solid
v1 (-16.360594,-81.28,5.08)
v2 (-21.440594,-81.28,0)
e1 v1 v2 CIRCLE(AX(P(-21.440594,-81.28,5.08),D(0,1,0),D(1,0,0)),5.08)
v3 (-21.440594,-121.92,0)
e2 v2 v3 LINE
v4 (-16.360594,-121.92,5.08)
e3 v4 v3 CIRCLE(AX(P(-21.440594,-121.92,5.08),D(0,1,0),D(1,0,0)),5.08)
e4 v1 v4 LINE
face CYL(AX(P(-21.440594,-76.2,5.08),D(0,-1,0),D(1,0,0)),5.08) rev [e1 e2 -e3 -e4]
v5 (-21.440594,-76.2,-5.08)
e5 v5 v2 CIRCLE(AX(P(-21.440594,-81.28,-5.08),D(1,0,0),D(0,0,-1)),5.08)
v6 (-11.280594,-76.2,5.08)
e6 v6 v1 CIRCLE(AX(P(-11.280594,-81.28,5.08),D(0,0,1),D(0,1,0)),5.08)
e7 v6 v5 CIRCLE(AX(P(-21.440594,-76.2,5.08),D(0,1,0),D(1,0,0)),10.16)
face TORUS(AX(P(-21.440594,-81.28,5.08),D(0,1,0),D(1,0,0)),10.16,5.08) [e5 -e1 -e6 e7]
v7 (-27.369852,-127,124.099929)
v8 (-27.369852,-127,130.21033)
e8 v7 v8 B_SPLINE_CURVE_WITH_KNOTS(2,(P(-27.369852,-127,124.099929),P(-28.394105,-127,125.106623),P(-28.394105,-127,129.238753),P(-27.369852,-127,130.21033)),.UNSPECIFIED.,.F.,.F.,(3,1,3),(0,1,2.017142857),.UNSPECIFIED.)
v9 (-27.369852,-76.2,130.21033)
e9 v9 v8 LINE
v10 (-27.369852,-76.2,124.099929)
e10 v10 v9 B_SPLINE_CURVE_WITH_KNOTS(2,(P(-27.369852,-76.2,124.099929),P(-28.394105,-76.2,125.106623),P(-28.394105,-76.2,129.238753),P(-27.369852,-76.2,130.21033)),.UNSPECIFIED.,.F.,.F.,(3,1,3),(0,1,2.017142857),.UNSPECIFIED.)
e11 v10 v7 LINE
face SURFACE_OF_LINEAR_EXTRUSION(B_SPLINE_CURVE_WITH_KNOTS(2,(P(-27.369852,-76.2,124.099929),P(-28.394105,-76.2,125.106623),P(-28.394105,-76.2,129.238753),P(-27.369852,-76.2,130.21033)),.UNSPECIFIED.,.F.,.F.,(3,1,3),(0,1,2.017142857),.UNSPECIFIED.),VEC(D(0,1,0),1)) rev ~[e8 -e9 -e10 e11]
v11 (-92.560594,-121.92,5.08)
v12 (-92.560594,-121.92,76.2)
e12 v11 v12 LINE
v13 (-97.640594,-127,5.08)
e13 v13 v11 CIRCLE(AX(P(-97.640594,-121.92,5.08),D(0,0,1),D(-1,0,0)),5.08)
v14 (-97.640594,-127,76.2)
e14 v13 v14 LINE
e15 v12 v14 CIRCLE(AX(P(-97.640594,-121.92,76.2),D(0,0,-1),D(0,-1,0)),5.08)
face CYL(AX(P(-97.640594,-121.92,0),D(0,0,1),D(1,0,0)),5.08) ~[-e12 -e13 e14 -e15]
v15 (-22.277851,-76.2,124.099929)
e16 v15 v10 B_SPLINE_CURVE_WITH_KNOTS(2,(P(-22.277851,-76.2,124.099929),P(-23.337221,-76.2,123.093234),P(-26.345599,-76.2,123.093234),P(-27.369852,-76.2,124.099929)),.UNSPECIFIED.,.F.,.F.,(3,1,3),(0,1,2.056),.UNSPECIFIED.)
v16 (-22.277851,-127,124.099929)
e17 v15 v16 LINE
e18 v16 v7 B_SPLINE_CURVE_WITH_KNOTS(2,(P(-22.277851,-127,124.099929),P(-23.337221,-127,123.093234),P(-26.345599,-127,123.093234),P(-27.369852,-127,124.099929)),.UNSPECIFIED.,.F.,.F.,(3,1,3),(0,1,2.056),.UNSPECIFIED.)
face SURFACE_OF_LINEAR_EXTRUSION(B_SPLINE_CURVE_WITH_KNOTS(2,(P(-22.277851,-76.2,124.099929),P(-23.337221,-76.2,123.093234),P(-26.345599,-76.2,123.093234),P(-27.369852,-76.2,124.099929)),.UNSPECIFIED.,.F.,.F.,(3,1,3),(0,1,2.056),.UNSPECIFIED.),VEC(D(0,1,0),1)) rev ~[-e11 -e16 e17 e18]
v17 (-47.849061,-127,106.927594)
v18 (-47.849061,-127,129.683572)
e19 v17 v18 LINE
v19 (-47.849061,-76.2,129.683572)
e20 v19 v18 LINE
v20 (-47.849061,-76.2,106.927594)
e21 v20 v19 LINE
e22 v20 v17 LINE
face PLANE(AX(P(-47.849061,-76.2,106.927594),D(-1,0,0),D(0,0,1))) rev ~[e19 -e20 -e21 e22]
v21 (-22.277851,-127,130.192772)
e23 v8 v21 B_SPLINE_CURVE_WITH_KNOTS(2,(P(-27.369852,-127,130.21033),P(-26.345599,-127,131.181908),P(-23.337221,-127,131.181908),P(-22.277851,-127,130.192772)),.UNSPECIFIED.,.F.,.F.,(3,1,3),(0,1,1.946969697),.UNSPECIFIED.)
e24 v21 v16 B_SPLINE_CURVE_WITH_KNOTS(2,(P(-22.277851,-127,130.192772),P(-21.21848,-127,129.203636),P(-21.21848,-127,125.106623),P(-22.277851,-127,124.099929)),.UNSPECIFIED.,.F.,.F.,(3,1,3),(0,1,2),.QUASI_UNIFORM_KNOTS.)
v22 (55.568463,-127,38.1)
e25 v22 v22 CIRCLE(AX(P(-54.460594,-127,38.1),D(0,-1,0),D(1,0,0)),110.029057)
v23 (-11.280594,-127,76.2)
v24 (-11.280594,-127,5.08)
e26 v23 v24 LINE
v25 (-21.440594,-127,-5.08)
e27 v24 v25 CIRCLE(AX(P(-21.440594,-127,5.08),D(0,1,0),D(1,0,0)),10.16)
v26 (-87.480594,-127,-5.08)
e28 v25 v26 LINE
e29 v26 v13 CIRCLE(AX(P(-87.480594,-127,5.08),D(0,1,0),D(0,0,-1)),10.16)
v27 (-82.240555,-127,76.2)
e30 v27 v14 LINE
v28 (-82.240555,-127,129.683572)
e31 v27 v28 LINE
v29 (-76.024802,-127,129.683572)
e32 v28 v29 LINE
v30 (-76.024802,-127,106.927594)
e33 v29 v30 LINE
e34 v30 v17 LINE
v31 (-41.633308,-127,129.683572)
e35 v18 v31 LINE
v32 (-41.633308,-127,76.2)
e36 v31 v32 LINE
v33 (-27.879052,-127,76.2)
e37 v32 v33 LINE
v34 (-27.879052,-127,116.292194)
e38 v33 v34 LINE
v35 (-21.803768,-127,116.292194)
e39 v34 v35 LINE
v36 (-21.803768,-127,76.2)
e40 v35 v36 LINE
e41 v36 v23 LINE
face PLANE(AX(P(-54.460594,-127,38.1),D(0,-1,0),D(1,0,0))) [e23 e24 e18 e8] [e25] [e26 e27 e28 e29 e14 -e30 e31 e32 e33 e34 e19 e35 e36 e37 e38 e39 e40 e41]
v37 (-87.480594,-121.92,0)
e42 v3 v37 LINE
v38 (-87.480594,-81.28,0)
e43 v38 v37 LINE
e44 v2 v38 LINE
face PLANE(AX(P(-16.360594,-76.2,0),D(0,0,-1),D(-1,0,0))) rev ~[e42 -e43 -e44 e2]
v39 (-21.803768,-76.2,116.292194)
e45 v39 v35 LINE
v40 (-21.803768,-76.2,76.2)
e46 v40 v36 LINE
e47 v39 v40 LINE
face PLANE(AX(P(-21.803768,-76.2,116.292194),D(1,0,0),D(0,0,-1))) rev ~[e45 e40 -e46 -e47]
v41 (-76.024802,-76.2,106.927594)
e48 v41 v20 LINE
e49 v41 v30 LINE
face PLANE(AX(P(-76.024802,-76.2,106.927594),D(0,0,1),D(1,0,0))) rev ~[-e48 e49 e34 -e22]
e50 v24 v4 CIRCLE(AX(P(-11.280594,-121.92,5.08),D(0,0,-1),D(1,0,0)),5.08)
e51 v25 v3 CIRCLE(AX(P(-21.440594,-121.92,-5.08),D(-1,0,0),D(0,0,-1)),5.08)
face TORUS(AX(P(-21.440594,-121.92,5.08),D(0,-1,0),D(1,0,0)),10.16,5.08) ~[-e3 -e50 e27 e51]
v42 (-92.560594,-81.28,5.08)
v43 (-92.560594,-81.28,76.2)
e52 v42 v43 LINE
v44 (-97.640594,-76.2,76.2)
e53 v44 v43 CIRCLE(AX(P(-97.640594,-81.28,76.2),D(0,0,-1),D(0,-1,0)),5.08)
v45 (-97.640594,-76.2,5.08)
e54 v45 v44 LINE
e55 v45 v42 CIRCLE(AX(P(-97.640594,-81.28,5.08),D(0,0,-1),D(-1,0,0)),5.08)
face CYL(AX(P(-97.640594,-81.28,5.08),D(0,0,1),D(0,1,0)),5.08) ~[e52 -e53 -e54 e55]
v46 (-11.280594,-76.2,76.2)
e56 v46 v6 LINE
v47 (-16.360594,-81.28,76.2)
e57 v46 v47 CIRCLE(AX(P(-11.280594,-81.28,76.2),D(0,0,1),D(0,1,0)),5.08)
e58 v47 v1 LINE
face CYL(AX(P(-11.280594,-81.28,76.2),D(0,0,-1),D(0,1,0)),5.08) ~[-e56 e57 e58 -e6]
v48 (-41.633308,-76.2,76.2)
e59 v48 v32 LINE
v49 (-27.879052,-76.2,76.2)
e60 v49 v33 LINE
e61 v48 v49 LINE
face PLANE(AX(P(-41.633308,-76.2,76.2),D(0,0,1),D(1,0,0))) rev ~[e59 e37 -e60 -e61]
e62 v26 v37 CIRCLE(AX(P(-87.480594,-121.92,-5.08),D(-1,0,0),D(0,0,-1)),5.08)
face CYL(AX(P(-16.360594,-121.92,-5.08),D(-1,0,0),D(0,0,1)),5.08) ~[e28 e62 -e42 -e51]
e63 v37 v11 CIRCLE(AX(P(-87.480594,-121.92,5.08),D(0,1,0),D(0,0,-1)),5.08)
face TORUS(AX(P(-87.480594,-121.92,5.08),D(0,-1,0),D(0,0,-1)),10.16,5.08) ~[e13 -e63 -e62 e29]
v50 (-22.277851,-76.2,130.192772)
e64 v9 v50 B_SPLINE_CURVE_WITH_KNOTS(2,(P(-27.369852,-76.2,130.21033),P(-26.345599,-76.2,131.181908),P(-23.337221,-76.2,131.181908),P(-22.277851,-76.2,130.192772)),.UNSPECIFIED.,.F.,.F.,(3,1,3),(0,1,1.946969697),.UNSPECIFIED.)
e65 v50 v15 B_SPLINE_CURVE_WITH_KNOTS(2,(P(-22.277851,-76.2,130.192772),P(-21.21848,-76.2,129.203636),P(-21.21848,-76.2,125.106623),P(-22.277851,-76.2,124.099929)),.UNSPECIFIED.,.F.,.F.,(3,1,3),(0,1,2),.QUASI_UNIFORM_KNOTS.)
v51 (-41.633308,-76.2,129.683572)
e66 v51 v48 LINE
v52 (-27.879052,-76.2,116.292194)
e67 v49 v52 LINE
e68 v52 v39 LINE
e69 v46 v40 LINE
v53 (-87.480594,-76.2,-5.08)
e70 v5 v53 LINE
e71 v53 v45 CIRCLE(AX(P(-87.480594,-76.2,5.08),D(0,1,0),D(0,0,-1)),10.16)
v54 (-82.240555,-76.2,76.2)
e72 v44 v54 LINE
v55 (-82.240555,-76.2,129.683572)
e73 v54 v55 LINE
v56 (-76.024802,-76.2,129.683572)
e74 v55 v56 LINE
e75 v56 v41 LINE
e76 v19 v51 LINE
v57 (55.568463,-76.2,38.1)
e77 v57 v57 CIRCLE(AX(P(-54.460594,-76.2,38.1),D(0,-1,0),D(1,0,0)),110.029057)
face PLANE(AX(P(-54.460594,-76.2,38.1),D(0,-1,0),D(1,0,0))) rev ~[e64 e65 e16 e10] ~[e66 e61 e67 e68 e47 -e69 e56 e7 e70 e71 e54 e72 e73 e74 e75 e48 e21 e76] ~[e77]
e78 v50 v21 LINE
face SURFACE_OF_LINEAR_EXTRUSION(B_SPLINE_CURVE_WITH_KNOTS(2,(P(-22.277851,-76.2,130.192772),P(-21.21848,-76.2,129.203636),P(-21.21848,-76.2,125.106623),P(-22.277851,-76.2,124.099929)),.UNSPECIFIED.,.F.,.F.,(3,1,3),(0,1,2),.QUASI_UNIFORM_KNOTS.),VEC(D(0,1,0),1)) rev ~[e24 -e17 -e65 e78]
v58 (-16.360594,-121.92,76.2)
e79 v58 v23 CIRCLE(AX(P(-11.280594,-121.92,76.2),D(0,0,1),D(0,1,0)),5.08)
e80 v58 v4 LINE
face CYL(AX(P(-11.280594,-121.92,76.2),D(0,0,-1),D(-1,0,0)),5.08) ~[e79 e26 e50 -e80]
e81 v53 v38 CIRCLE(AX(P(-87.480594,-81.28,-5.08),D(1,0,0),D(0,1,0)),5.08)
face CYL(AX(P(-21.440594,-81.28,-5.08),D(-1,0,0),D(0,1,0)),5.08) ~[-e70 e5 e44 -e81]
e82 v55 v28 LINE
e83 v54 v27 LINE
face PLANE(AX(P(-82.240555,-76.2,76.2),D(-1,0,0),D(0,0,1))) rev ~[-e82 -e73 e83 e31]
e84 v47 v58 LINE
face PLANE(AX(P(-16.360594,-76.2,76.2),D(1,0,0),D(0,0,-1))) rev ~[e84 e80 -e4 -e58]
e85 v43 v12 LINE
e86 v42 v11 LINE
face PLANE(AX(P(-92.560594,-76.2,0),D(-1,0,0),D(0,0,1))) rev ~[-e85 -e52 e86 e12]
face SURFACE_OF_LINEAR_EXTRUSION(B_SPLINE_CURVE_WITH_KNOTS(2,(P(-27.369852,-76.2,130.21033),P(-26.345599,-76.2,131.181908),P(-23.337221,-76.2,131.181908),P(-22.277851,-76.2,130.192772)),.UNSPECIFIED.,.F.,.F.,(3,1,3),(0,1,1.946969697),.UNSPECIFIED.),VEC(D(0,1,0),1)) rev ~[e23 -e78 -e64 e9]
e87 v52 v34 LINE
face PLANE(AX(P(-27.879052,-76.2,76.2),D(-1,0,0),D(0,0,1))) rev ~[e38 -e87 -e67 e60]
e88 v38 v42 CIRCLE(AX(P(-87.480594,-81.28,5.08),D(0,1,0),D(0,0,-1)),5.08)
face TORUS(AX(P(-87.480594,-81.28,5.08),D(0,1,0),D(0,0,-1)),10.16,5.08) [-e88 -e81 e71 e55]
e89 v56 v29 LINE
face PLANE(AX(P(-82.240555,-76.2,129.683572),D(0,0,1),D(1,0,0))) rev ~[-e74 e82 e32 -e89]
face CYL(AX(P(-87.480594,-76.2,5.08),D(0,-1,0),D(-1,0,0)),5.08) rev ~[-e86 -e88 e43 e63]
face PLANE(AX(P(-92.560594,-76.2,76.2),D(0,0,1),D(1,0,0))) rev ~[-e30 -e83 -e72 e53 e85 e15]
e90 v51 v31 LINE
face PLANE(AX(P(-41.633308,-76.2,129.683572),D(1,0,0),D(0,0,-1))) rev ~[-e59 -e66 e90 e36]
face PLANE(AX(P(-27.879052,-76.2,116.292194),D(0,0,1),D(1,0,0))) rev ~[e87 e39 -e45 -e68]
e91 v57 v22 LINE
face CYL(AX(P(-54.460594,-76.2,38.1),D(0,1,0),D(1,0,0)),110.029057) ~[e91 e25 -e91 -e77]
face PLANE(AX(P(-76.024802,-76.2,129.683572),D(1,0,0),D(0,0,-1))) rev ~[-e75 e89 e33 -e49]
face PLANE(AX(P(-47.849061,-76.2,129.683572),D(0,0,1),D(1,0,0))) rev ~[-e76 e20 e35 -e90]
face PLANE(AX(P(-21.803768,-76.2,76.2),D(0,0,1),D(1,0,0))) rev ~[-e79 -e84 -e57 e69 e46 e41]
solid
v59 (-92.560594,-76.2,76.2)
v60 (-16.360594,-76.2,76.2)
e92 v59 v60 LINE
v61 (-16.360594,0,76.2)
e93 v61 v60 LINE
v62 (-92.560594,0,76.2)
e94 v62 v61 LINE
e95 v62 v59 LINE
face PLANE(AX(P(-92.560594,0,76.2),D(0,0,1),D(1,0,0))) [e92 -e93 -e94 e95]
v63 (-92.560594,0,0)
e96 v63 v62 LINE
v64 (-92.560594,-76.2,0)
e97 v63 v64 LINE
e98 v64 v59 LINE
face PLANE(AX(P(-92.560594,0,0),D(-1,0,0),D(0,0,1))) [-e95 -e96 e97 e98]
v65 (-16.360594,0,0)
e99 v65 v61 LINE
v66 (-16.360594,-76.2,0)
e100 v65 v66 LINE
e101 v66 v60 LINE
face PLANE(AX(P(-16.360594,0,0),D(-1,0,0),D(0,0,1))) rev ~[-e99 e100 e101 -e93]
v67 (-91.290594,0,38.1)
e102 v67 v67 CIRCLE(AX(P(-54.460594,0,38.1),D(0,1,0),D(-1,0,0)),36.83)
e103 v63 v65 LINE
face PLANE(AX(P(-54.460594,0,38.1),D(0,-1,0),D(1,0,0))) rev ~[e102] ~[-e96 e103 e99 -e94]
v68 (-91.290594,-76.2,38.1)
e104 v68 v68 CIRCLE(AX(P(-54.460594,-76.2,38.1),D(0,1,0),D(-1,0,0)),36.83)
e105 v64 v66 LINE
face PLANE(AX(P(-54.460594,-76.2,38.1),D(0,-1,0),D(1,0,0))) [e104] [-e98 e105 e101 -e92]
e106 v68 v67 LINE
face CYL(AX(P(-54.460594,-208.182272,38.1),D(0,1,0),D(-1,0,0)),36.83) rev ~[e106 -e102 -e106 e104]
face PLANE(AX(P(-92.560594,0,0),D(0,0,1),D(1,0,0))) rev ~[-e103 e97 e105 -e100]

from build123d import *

# Parameters (mm, degrees)
F0_W     = 76.2
F0_H     = 76.2
F1_DEPTH = 76.2
F2_R     = 110.0290570582
F3_DEPTH = 50.8
F5_D     = 73.66
F6_R     = 5.08
F7_R     = 5.08


with BuildPart() as f1:
    # F0 (on Front) → F1 (new body)
    with BuildSketch(Plane.XZ):
        with Locations((-54.4605939882, 38.1)):
            Rectangle(F0_W, F0_H)
    extrude(amount=F1_DEPTH)

    # F5 (through all)
    with Locations(Plane.XZ.offset(76.2)):
        with Locations((-54.4605939882, 38.1)):
            Hole(F5_D / 2)


with BuildPart() as f3:
    # F2 (on face) → F3 (new body)
    with BuildSketch(Plane.XZ.offset(76.2)):
        with Locations((-54.4605939882, 38.1)):
            Circle(F2_R)
        Polygon((-41.6333082144, 129.6835716996), (-41.6333082144, 76.2), (-27.8790519774, 76.2), (-27.8790519774, 116.2921937122), (-21.8037677331, 116.2921937122), (-21.8037677331, 76.2), (-16.3605939882, 76.2), (-16.3605939882, 0), (-92.5605939882, 0), (-92.5605939882, 76.2), (-82.2405549261, 76.2), (-82.2405549261, 129.6835716996), (-76.024801682, 129.6835716996), (-76.024801682, 106.927593721), (-47.8490614585, 106.927593721), (-47.8490614585, 129.6835716996), align=None, mode=Mode.SUBTRACT)
        with BuildLine():
            add(Edge.make_bspline(
                [(-27.3698518528, 124.0999289549), (-28.3941049769, 125.1066234539), (-28.3941049769, 127.155129702)],
                knots=[0, 0, 0, 1, 1, 1], degree=2))
            add(Edge.make_bspline(
                [(-28.3941049769, 127.155129702), (-28.3941049769, 129.2387532), (-27.3698518528, 130.2103304491)],
                knots=[0, 0, 0, 1, 1, 1], degree=2))
            add(Edge.make_bspline(
                [(-27.3698518528, 130.2103304491), (-26.3455987288, 131.1819076982), (-24.8004397303, 131.1819076982)],
                knots=[0, 0, 0, 1, 1, 1], degree=2))
            add(Edge.make_bspline(
                [(-24.8004397303, 131.1819076982), (-23.3372209816, 131.1819076982), (-22.2778506076, 130.1927718241)],
                knots=[0, 0, 0, 1, 1, 1], degree=2))
            add(Edge.make_bspline(
                [(-22.2778506076, 130.1927718241), (-21.2184802336, 129.2036359501), (-21.2184802336, 127.155129702)],
                knots=[0, 0, 0, 1, 1, 1], degree=2))
            add(Edge.make_bspline(
                [(-21.2184802336, 127.155129702), (-21.2184802336, 125.1066234539), (-22.2778506076, 124.0999289549)],
                knots=[0, 0, 0, 1, 1, 1], degree=2))
            add(Edge.make_bspline(
                [(-22.2778506076, 124.0999289549), (-23.3372209816, 123.0932344558), (-24.8004397303, 123.0932344558)],
                knots=[0, 0, 0, 1, 1, 1], degree=2))
            add(Edge.make_bspline(
                [(-24.8004397303, 123.0932344558), (-26.3455987288, 123.0932344558), (-27.3698518528, 124.0999289549)],
                knots=[0, 0, 0, 1, 1, 1], degree=2))
        make_face(mode=Mode.SUBTRACT)
    extrude(amount=F3_DEPTH)

    # F6
    f6_edges = [f3.edges().sort_by_distance(p)[0] for p in [
        (55.568463, -101.6, 38.1),
        (-16.360594, -101.6, 0),
        (-16.360594, -127, 38.1),
        (-92.560594, -101.6, 0),
        (-54.460594, -127, 0),
        (-92.560594, -127, 38.1),
    ]]
    fillet(f6_edges, radius=F6_R)

    # F7
    f7_edges = [f3.edges().sort_by_distance(p)[0] for p in [
        (-54.460594, -76.2, 0),
        (-21.440594, -99.06, 0),
        (-87.480594, -99.06, 0),
        (-54.460594, -121.92, 0),
    ]]
    fillet(f7_edges, radius=F7_R)


solid = Compound([f1.part, f3.part])
